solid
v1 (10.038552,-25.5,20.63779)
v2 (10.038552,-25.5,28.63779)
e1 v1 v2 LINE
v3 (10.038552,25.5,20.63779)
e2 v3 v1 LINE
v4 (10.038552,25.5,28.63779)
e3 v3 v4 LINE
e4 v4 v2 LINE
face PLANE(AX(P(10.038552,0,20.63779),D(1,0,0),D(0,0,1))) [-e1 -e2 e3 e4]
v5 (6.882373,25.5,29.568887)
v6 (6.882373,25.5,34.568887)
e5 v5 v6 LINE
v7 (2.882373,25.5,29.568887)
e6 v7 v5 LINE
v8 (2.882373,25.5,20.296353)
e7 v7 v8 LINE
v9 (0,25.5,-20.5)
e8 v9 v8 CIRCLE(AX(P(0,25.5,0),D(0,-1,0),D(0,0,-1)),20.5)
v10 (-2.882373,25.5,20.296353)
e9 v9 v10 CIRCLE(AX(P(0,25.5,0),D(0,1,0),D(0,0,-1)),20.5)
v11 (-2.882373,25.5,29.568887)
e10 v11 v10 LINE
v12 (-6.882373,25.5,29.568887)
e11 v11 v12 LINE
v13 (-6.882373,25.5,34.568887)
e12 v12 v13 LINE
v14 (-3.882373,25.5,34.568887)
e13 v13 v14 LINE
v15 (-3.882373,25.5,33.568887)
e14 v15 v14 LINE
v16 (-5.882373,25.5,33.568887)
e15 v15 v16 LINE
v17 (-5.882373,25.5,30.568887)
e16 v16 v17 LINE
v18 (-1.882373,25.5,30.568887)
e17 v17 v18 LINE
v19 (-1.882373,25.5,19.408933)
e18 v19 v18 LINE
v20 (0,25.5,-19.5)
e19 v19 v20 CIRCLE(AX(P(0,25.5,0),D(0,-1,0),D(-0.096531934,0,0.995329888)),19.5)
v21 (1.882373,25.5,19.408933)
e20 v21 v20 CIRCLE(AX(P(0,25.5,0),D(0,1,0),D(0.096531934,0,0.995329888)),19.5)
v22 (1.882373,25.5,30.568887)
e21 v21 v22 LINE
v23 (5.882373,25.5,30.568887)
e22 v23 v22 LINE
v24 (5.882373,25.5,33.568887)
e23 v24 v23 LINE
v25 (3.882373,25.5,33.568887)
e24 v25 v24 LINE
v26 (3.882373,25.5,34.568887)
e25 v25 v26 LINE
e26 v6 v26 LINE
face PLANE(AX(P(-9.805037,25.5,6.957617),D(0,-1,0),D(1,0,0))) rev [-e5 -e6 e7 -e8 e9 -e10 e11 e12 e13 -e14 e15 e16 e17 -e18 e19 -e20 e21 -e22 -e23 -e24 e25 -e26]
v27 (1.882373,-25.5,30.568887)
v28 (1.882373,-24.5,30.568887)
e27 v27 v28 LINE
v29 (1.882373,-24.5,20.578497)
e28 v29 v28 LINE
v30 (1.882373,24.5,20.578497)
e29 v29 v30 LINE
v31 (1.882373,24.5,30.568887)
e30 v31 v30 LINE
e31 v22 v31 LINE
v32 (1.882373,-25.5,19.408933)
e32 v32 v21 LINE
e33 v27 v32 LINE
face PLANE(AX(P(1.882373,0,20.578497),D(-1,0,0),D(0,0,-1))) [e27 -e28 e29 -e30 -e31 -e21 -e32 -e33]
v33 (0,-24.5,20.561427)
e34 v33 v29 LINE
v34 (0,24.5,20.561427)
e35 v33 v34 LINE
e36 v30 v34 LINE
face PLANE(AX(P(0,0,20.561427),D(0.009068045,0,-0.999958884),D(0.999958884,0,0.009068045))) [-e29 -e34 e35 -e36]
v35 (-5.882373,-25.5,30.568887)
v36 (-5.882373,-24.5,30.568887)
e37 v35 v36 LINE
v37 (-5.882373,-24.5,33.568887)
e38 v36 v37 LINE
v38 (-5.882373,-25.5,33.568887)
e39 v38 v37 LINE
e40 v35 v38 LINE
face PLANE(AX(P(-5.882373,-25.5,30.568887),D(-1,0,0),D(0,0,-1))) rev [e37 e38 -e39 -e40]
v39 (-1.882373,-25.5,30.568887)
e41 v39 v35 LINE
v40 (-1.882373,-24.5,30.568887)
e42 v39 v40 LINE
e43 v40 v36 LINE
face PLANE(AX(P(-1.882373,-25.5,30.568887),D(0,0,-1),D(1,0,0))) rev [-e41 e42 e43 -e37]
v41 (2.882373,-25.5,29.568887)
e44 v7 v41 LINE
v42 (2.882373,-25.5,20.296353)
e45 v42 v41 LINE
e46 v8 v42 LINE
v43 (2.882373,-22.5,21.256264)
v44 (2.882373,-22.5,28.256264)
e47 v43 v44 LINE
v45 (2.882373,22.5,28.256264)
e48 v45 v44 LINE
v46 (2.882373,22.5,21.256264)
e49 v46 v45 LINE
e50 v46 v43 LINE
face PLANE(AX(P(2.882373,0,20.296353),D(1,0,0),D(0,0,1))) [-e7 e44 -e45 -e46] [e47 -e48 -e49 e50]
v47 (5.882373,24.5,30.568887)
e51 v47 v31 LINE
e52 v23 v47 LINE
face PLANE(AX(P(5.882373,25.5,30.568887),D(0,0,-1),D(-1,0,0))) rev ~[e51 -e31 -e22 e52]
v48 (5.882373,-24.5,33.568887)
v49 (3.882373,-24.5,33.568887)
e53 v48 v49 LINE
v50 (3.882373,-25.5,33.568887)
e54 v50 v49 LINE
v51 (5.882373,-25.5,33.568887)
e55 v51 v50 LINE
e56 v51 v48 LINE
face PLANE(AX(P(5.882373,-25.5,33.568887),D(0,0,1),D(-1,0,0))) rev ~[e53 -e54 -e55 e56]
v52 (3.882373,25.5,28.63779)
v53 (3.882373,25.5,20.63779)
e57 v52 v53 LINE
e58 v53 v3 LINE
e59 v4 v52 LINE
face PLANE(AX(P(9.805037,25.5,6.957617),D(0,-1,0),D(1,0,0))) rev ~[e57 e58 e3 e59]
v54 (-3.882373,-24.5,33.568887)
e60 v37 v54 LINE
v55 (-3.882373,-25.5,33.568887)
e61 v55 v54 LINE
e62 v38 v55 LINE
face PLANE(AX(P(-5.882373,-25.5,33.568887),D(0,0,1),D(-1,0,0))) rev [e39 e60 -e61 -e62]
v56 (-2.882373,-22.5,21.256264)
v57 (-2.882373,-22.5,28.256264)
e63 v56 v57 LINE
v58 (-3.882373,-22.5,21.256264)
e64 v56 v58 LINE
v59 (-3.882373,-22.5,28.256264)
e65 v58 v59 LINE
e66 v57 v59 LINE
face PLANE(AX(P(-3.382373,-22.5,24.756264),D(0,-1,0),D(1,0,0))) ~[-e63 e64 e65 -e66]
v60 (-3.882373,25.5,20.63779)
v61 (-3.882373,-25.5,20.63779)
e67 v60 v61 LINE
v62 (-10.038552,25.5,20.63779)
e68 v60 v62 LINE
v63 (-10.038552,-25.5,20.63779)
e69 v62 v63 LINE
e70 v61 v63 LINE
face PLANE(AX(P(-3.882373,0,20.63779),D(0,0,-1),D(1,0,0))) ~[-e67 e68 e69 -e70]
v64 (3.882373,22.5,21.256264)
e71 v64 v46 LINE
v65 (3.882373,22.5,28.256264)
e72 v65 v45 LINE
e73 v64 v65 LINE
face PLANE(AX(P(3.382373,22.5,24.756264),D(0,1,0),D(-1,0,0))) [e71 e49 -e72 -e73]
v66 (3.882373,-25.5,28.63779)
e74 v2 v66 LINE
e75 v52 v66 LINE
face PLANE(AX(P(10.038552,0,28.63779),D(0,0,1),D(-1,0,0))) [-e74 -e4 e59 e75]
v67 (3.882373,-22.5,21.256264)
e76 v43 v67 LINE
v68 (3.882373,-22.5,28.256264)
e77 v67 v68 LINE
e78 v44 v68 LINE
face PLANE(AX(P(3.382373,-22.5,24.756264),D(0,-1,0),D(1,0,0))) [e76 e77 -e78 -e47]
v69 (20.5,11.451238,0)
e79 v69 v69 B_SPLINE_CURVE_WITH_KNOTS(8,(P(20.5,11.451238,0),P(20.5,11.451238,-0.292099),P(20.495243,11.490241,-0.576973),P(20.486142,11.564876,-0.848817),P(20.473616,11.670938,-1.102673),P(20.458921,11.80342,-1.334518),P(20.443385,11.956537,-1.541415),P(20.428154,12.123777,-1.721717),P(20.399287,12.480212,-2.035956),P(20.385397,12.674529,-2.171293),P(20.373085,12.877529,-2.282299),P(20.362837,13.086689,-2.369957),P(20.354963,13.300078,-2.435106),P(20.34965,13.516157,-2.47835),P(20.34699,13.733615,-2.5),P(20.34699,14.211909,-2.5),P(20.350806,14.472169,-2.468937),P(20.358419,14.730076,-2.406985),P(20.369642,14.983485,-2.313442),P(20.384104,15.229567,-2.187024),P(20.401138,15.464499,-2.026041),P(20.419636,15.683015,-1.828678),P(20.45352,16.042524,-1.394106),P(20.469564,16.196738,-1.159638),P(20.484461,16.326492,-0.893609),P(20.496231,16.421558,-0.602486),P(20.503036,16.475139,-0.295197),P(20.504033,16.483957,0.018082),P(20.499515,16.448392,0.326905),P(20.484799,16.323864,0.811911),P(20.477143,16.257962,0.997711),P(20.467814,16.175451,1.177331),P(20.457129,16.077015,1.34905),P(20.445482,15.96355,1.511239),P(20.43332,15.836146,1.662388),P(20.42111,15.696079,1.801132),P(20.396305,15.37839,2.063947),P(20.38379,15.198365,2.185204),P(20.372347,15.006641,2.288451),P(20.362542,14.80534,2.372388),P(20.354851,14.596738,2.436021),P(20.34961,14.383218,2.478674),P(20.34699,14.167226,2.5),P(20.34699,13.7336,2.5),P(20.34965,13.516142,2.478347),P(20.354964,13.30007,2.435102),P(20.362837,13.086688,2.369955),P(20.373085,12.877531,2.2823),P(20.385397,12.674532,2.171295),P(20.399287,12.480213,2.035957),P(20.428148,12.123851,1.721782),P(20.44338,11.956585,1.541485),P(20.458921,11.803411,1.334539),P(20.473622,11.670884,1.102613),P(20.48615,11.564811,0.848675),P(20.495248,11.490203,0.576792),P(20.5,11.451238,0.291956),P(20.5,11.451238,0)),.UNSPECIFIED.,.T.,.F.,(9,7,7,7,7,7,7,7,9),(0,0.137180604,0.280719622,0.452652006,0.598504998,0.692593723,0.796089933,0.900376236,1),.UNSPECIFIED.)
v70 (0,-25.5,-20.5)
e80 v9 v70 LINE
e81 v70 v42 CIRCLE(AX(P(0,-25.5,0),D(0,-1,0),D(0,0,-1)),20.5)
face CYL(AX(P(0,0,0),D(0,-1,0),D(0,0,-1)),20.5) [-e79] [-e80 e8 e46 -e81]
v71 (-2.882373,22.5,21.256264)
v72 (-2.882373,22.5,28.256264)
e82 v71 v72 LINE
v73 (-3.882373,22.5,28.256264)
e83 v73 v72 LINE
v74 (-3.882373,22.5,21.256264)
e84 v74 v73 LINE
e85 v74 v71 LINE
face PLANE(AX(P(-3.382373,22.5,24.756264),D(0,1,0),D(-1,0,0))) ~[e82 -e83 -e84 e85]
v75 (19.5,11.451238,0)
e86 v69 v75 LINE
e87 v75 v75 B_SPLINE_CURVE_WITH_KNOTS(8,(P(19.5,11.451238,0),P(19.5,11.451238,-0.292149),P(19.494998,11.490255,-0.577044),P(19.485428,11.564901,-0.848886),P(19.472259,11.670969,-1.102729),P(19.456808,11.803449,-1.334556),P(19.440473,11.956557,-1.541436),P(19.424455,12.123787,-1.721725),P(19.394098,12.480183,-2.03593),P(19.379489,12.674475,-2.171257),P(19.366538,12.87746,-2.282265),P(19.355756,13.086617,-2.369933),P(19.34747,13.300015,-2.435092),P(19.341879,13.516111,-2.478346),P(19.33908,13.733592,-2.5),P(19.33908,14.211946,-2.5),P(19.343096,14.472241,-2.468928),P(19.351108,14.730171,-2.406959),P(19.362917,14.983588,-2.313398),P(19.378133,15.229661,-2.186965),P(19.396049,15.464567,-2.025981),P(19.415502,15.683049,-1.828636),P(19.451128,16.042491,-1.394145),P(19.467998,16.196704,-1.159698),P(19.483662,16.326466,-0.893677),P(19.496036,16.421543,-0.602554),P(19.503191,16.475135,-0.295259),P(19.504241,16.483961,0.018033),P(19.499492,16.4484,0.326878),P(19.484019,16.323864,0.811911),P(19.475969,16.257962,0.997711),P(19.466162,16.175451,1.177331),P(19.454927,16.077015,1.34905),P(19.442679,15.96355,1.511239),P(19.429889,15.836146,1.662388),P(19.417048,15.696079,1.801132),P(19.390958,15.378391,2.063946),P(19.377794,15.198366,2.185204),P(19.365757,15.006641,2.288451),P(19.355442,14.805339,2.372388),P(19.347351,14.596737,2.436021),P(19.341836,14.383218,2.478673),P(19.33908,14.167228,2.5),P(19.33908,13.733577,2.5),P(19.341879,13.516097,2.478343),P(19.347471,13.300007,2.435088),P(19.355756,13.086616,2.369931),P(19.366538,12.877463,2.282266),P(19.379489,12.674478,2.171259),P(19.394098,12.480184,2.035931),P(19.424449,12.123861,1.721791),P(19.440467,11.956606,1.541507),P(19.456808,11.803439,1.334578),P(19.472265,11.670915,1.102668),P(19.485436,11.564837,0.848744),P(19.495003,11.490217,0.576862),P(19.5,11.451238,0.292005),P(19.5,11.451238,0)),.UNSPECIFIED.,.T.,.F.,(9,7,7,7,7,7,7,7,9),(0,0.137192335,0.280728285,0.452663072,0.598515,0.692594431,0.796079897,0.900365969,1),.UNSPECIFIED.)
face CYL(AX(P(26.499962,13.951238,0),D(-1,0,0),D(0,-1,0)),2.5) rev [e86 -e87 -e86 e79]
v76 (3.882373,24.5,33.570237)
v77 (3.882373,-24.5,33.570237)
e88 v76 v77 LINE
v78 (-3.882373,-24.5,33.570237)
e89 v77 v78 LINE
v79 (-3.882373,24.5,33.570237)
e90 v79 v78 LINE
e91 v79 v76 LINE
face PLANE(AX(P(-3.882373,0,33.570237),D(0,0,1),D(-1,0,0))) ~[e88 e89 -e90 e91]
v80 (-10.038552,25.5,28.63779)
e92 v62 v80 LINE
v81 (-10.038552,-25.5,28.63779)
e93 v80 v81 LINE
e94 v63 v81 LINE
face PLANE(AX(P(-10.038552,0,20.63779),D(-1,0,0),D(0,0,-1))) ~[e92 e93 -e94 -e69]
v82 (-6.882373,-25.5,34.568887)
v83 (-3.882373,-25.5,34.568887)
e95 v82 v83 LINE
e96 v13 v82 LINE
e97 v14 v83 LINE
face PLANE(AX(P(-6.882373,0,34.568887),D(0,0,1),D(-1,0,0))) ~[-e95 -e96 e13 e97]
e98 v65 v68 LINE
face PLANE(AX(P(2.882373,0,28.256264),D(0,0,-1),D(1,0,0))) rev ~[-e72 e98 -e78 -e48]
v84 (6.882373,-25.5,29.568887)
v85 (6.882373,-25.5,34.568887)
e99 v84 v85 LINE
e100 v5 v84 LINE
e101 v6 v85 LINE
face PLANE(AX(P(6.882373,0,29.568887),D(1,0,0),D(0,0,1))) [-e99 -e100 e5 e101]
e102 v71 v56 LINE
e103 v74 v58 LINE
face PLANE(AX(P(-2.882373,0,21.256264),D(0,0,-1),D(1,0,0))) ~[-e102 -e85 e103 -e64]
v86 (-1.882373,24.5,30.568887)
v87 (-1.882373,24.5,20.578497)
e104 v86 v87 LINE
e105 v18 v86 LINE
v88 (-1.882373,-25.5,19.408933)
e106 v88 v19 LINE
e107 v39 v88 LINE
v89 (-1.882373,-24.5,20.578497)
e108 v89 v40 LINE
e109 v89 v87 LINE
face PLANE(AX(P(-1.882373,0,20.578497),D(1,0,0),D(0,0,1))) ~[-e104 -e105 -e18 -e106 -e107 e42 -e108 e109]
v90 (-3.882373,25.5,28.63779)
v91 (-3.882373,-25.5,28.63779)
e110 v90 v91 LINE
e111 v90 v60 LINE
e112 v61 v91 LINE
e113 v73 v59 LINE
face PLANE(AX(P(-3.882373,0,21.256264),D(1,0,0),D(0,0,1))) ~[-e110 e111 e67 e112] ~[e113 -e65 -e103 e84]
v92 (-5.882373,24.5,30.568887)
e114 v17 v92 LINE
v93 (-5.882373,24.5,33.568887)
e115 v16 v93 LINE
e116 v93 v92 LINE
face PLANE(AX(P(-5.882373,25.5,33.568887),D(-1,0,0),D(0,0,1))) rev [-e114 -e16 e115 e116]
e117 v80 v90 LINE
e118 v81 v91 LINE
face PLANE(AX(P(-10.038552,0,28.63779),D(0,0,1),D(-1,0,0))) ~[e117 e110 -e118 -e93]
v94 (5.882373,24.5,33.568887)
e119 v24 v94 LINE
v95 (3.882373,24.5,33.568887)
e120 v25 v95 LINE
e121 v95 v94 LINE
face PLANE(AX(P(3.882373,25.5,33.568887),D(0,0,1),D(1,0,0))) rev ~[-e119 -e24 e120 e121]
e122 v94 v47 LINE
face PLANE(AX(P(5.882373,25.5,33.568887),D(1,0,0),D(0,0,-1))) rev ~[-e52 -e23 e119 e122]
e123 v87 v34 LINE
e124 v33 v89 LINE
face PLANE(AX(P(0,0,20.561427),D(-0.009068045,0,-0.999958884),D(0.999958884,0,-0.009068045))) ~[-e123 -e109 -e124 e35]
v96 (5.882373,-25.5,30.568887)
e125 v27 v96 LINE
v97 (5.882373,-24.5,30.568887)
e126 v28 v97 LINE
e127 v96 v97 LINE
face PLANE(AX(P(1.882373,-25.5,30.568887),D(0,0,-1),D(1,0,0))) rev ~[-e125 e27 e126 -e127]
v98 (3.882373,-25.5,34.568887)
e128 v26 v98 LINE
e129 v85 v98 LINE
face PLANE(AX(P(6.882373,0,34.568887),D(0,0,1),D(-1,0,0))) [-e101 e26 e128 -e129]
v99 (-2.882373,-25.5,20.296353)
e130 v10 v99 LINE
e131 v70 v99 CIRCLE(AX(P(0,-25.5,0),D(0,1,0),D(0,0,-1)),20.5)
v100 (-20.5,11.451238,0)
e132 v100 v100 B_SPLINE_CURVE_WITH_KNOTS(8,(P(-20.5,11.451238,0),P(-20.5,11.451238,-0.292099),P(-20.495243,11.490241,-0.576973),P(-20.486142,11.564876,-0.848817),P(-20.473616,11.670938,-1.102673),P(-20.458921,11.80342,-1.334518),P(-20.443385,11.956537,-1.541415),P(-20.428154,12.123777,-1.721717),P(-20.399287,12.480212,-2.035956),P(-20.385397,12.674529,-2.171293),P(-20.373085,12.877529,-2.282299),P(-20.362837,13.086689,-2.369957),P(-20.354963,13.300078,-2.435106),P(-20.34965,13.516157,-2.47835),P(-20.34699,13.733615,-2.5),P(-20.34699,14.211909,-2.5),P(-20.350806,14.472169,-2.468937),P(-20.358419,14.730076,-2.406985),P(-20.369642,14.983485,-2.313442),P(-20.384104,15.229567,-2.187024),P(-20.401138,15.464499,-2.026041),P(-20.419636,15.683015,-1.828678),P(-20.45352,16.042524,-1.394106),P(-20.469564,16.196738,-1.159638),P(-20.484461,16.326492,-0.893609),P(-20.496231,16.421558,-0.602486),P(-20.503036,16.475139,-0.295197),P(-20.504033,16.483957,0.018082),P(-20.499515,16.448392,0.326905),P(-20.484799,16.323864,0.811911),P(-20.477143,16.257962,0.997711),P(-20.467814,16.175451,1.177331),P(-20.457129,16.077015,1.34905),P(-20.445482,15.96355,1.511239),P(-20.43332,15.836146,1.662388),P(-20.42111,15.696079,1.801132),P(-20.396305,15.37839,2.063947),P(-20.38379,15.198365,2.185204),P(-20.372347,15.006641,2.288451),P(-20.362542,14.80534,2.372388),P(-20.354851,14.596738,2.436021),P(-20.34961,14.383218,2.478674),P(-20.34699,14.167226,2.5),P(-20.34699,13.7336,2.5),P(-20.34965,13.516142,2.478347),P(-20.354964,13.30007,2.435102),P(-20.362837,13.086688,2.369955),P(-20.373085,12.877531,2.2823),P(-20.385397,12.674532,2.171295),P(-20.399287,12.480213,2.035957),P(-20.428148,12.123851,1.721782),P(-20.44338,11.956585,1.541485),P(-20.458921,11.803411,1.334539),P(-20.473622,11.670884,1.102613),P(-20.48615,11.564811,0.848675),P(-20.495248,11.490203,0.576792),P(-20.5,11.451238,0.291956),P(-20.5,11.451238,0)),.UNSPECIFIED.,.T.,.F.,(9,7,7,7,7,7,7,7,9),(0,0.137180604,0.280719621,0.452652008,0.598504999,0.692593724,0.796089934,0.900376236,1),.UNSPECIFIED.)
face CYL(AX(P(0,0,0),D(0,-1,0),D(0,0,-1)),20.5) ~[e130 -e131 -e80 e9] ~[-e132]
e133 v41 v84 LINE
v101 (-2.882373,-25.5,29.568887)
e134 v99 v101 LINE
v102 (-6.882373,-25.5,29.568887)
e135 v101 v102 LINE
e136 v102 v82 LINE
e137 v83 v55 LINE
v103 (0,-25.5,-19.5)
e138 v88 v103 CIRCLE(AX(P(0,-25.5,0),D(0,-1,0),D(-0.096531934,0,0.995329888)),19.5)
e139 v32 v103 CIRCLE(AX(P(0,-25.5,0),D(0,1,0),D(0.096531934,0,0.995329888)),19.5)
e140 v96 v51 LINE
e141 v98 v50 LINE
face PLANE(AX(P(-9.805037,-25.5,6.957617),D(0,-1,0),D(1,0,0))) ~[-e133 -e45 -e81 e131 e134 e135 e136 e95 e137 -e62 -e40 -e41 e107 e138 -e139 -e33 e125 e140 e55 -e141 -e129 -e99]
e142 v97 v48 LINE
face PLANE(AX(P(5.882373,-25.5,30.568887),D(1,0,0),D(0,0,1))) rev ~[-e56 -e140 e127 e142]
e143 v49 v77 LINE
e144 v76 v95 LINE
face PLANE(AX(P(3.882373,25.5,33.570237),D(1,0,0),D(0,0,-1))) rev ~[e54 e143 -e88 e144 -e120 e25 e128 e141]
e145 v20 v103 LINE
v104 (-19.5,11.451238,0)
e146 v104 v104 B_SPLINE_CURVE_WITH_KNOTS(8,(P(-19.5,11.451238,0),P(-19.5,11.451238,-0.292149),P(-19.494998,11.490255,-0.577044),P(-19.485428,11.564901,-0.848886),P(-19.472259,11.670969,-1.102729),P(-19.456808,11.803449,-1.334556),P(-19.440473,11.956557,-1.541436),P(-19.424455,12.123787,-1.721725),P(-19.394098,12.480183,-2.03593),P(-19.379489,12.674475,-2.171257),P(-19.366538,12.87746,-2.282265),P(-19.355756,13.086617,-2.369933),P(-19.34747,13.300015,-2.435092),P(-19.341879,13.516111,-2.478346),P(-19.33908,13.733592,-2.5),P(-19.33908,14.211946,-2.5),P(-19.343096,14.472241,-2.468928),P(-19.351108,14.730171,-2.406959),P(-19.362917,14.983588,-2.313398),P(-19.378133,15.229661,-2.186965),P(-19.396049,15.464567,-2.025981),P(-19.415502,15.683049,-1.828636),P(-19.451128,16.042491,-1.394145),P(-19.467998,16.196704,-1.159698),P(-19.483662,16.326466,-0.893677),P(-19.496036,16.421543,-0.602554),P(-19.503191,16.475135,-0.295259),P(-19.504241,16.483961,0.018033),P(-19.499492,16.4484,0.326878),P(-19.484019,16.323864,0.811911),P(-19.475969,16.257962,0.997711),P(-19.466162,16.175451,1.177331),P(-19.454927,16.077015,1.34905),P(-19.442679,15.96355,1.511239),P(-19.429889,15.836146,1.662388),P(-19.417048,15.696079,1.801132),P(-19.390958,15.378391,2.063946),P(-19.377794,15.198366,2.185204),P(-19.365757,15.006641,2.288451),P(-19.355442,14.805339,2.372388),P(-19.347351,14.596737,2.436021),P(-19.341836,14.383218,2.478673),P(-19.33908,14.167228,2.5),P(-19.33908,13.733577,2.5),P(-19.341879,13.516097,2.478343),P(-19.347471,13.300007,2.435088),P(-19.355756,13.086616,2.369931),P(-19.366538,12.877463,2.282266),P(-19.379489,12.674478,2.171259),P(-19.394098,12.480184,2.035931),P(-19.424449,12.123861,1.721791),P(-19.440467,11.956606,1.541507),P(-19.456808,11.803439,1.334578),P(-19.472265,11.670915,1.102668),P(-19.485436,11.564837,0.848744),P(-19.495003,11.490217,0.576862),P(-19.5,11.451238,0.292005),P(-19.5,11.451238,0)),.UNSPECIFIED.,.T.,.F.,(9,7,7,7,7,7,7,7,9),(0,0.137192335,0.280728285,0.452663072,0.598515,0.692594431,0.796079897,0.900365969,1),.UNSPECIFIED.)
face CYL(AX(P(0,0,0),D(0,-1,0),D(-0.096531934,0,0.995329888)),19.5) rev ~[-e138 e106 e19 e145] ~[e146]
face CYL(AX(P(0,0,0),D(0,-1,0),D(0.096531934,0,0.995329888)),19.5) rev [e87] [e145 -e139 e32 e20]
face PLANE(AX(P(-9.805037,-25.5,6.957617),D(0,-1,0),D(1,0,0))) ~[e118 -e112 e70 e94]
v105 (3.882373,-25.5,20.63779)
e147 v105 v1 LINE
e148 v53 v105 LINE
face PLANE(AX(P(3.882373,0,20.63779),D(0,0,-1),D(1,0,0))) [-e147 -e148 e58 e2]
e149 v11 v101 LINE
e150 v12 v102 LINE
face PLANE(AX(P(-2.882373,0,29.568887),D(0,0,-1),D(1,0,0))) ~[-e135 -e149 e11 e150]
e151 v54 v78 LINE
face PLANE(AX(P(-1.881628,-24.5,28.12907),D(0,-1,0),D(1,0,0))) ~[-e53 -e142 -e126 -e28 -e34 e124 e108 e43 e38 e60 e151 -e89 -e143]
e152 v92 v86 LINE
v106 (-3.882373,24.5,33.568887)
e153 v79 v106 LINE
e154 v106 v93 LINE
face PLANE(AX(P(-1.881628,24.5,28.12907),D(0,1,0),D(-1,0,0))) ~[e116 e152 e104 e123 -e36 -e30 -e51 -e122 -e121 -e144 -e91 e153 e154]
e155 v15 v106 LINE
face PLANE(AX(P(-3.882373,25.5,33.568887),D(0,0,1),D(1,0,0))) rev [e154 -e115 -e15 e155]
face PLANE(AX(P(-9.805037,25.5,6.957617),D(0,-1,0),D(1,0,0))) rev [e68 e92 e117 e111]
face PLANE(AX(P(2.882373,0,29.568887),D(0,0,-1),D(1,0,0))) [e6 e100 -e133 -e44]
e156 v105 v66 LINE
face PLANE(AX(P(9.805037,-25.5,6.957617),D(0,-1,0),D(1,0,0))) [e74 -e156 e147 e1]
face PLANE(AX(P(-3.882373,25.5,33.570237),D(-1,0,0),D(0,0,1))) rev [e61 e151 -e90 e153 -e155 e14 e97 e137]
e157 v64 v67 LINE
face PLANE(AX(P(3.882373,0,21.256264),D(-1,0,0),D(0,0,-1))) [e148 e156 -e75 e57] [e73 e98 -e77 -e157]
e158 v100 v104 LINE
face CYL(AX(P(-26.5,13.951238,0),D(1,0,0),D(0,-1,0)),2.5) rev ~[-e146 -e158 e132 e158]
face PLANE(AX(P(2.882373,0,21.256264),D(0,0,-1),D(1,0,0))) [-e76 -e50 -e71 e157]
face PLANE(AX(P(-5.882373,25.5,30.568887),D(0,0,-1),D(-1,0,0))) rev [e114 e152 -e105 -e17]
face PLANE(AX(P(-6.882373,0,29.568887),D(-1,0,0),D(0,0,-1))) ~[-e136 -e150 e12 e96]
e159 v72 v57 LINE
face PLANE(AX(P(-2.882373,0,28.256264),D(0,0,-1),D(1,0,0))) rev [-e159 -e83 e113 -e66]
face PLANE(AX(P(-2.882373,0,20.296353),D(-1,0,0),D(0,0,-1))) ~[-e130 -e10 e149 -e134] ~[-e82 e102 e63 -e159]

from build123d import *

# Parameters (mm, degrees)
F0_W      = 1
F0_H      = 7
F1_DEPTH  = 25.5
F2_W      = 1
F2_H      = 7
F3_DEPTH  = 3
F4_W      = 1
F4_H      = 7
F5_DEPTH  = 3
F7_DEPTH  = 1
F9_DEPTH  = 1
F13_D     = 5
F13_DEPTH = 6
F13_TIP   = 1.5021515476


# Not quite as in the source:
# - a pattern or mirror of a feature is missing from the dataset's text; its kind, count and spacing are read off the source's solid


with BuildPart() as f1:
    # F0 (on Front) → F1 (new body, symmetric)
    with BuildSketch(Plane.XZ):
        with BuildLine():
            ThreePointArc((1.8823727184, 19.4089328132), (19.4772198973, -0.9422871488), (0, -19.5))
            Line((0, -19.5), (0, -20.5))
            ThreePointArc((0, -20.5), (20.4490247642, -1.444778942), (2.8823727184, 20.2963525667))
            Line((2.8823727184, 20.2963525667), (2.8823727184, 21.2562642992))
            Line((2.8823727184, 21.2562642992), (2.8823727184, 28.2562642992))
            Line((2.8823727184, 28.2562642992), (2.8823727184, 29.5688871337))
            Line((2.8823727184, 29.5688871337), (6.8823727184, 29.5688871337))
            Line((6.8823727184, 29.5688871337), (6.8823727184, 34.5688871337))
            Line((6.8823727184, 34.5688871337), (3.8823727184, 34.5688871337))
            Line((3.8823727184, 34.5688871337), (3.8823727184, 33.5702374578))
            Line((3.8823727184, 33.5702374578), (3.8823727184, 33.5688871337))
            Line((3.8823727184, 33.5688871337), (5.8823727184, 33.5688871337))
            Line((5.8823727184, 33.5688871337), (5.8823727184, 30.5688871337))
            Line((5.8823727184, 30.5688871337), (1.8823727184, 30.5688871337))
            Line((1.8823727184, 30.5688871337), (1.8823727184, 20.578497021))
            Line((1.8823727184, 20.578497021), (1.8823727184, 19.4089328132))
        make_face()
        Polygon((0, 20.561426878), (1.8823727184, 20.578497021), (1.8823727184, 30.5688871337), (5.8823727184, 30.5688871337), (5.8823727184, 33.5688871337), (3.8823727184, 33.5688871337), (3.8823727184, 33.5702374578), (0, 33.5702374578), align=None)
        with Locations((3.3823727184, 24.7562642992)):
            Rectangle(F0_W, F0_H)
        Polygon((3.8823727184, 28.2562642992), (3.8823727184, 21.2562642992), (3.8823727184, 20.6377897412), (10.0385518745, 20.6377897412), (10.0385518745, 28.6377897412), (3.8823727184, 28.6377897412), align=None)
    extrude(amount=F1_DEPTH, both=True)

    # F2 (on face) → F3 (cut)
    with BuildSketch(Plane.XZ.offset(25.5)):
        with Locations((3.3823727184, 24.7562642992)):
            Rectangle(F2_W, F2_H)
    extrude(amount=-F3_DEPTH, mode=Mode.SUBTRACT)

    # F4 (on face) → F5 (cut)
    with BuildSketch(Plane(origin=(0, 25.5, 0), x_dir=(-1, 0, 0), z_dir=(0, 1, 0))):
        with Locations((-3.3823727184, 24.7562642992)):
            Rectangle(F4_W, F4_H)
    extrude(amount=-F5_DEPTH, mode=Mode.SUBTRACT)

    # F6 (on face) → F7 (cut)
    with BuildSketch(Plane.XZ.offset(25.5)):
        Polygon((0, 20.561426878), (1.8823727184, 20.578497021), (1.8823727184, 30.5688871337), (5.8823727184, 30.5688871337), (5.8823727184, 33.5688871337), (3.8823727184, 33.5688871337), (3.8823727184, 33.5702374578), (0, 33.5702374578), align=None)
    extrude(amount=-F7_DEPTH, mode=Mode.SUBTRACT)

    # F8 (on face) → F9 (cut)
    with BuildSketch(Plane(origin=(0, 25.5, 0), x_dir=(-1, 0, 0), z_dir=(0, 1, 0))):
        Polygon((-1.8823727184, 30.5688871337), (-1.8823727184, 20.578497021), (0, 20.561426878), (0, 33.5702374578), (-3.8823727184, 33.5702374578), (-3.8823727184, 33.5688871337), (-5.8823727184, 33.5688871337), (-5.8823727184, 30.5688871337), align=None)
    extrude(amount=-F9_DEPTH, mode=Mode.SUBTRACT)

    # F10: F1 across plane


with BuildPart() as f1_1:
    add(f1.part)
    add(f1.part.mirror(Plane.YZ))

    # F13
    with Locations(Plane(origin=(-20.5, 0, 0), x_dir=(0, 1, 0), z_dir=(-1, 0, 0))):
        with Locations((13.9512377791, 0)):
            f13 = Hole(F13_D / 2, depth=F13_DEPTH)
            with Locations((0, 0, -(F13_DEPTH + F13_TIP / 2))):  # 118° drill point
                Cone(0, F13_D / 2, F13_TIP, mode=Mode.SUBTRACT)

    # F13_copies: F13 across plane
    add(f13.mirror(Plane(origin=(-1.9e-05, 0, 0), x_dir=(0, 0, 1), z_dir=(1, 0, 0))), mode=Mode.SUBTRACT)


solid = f1_1.part
